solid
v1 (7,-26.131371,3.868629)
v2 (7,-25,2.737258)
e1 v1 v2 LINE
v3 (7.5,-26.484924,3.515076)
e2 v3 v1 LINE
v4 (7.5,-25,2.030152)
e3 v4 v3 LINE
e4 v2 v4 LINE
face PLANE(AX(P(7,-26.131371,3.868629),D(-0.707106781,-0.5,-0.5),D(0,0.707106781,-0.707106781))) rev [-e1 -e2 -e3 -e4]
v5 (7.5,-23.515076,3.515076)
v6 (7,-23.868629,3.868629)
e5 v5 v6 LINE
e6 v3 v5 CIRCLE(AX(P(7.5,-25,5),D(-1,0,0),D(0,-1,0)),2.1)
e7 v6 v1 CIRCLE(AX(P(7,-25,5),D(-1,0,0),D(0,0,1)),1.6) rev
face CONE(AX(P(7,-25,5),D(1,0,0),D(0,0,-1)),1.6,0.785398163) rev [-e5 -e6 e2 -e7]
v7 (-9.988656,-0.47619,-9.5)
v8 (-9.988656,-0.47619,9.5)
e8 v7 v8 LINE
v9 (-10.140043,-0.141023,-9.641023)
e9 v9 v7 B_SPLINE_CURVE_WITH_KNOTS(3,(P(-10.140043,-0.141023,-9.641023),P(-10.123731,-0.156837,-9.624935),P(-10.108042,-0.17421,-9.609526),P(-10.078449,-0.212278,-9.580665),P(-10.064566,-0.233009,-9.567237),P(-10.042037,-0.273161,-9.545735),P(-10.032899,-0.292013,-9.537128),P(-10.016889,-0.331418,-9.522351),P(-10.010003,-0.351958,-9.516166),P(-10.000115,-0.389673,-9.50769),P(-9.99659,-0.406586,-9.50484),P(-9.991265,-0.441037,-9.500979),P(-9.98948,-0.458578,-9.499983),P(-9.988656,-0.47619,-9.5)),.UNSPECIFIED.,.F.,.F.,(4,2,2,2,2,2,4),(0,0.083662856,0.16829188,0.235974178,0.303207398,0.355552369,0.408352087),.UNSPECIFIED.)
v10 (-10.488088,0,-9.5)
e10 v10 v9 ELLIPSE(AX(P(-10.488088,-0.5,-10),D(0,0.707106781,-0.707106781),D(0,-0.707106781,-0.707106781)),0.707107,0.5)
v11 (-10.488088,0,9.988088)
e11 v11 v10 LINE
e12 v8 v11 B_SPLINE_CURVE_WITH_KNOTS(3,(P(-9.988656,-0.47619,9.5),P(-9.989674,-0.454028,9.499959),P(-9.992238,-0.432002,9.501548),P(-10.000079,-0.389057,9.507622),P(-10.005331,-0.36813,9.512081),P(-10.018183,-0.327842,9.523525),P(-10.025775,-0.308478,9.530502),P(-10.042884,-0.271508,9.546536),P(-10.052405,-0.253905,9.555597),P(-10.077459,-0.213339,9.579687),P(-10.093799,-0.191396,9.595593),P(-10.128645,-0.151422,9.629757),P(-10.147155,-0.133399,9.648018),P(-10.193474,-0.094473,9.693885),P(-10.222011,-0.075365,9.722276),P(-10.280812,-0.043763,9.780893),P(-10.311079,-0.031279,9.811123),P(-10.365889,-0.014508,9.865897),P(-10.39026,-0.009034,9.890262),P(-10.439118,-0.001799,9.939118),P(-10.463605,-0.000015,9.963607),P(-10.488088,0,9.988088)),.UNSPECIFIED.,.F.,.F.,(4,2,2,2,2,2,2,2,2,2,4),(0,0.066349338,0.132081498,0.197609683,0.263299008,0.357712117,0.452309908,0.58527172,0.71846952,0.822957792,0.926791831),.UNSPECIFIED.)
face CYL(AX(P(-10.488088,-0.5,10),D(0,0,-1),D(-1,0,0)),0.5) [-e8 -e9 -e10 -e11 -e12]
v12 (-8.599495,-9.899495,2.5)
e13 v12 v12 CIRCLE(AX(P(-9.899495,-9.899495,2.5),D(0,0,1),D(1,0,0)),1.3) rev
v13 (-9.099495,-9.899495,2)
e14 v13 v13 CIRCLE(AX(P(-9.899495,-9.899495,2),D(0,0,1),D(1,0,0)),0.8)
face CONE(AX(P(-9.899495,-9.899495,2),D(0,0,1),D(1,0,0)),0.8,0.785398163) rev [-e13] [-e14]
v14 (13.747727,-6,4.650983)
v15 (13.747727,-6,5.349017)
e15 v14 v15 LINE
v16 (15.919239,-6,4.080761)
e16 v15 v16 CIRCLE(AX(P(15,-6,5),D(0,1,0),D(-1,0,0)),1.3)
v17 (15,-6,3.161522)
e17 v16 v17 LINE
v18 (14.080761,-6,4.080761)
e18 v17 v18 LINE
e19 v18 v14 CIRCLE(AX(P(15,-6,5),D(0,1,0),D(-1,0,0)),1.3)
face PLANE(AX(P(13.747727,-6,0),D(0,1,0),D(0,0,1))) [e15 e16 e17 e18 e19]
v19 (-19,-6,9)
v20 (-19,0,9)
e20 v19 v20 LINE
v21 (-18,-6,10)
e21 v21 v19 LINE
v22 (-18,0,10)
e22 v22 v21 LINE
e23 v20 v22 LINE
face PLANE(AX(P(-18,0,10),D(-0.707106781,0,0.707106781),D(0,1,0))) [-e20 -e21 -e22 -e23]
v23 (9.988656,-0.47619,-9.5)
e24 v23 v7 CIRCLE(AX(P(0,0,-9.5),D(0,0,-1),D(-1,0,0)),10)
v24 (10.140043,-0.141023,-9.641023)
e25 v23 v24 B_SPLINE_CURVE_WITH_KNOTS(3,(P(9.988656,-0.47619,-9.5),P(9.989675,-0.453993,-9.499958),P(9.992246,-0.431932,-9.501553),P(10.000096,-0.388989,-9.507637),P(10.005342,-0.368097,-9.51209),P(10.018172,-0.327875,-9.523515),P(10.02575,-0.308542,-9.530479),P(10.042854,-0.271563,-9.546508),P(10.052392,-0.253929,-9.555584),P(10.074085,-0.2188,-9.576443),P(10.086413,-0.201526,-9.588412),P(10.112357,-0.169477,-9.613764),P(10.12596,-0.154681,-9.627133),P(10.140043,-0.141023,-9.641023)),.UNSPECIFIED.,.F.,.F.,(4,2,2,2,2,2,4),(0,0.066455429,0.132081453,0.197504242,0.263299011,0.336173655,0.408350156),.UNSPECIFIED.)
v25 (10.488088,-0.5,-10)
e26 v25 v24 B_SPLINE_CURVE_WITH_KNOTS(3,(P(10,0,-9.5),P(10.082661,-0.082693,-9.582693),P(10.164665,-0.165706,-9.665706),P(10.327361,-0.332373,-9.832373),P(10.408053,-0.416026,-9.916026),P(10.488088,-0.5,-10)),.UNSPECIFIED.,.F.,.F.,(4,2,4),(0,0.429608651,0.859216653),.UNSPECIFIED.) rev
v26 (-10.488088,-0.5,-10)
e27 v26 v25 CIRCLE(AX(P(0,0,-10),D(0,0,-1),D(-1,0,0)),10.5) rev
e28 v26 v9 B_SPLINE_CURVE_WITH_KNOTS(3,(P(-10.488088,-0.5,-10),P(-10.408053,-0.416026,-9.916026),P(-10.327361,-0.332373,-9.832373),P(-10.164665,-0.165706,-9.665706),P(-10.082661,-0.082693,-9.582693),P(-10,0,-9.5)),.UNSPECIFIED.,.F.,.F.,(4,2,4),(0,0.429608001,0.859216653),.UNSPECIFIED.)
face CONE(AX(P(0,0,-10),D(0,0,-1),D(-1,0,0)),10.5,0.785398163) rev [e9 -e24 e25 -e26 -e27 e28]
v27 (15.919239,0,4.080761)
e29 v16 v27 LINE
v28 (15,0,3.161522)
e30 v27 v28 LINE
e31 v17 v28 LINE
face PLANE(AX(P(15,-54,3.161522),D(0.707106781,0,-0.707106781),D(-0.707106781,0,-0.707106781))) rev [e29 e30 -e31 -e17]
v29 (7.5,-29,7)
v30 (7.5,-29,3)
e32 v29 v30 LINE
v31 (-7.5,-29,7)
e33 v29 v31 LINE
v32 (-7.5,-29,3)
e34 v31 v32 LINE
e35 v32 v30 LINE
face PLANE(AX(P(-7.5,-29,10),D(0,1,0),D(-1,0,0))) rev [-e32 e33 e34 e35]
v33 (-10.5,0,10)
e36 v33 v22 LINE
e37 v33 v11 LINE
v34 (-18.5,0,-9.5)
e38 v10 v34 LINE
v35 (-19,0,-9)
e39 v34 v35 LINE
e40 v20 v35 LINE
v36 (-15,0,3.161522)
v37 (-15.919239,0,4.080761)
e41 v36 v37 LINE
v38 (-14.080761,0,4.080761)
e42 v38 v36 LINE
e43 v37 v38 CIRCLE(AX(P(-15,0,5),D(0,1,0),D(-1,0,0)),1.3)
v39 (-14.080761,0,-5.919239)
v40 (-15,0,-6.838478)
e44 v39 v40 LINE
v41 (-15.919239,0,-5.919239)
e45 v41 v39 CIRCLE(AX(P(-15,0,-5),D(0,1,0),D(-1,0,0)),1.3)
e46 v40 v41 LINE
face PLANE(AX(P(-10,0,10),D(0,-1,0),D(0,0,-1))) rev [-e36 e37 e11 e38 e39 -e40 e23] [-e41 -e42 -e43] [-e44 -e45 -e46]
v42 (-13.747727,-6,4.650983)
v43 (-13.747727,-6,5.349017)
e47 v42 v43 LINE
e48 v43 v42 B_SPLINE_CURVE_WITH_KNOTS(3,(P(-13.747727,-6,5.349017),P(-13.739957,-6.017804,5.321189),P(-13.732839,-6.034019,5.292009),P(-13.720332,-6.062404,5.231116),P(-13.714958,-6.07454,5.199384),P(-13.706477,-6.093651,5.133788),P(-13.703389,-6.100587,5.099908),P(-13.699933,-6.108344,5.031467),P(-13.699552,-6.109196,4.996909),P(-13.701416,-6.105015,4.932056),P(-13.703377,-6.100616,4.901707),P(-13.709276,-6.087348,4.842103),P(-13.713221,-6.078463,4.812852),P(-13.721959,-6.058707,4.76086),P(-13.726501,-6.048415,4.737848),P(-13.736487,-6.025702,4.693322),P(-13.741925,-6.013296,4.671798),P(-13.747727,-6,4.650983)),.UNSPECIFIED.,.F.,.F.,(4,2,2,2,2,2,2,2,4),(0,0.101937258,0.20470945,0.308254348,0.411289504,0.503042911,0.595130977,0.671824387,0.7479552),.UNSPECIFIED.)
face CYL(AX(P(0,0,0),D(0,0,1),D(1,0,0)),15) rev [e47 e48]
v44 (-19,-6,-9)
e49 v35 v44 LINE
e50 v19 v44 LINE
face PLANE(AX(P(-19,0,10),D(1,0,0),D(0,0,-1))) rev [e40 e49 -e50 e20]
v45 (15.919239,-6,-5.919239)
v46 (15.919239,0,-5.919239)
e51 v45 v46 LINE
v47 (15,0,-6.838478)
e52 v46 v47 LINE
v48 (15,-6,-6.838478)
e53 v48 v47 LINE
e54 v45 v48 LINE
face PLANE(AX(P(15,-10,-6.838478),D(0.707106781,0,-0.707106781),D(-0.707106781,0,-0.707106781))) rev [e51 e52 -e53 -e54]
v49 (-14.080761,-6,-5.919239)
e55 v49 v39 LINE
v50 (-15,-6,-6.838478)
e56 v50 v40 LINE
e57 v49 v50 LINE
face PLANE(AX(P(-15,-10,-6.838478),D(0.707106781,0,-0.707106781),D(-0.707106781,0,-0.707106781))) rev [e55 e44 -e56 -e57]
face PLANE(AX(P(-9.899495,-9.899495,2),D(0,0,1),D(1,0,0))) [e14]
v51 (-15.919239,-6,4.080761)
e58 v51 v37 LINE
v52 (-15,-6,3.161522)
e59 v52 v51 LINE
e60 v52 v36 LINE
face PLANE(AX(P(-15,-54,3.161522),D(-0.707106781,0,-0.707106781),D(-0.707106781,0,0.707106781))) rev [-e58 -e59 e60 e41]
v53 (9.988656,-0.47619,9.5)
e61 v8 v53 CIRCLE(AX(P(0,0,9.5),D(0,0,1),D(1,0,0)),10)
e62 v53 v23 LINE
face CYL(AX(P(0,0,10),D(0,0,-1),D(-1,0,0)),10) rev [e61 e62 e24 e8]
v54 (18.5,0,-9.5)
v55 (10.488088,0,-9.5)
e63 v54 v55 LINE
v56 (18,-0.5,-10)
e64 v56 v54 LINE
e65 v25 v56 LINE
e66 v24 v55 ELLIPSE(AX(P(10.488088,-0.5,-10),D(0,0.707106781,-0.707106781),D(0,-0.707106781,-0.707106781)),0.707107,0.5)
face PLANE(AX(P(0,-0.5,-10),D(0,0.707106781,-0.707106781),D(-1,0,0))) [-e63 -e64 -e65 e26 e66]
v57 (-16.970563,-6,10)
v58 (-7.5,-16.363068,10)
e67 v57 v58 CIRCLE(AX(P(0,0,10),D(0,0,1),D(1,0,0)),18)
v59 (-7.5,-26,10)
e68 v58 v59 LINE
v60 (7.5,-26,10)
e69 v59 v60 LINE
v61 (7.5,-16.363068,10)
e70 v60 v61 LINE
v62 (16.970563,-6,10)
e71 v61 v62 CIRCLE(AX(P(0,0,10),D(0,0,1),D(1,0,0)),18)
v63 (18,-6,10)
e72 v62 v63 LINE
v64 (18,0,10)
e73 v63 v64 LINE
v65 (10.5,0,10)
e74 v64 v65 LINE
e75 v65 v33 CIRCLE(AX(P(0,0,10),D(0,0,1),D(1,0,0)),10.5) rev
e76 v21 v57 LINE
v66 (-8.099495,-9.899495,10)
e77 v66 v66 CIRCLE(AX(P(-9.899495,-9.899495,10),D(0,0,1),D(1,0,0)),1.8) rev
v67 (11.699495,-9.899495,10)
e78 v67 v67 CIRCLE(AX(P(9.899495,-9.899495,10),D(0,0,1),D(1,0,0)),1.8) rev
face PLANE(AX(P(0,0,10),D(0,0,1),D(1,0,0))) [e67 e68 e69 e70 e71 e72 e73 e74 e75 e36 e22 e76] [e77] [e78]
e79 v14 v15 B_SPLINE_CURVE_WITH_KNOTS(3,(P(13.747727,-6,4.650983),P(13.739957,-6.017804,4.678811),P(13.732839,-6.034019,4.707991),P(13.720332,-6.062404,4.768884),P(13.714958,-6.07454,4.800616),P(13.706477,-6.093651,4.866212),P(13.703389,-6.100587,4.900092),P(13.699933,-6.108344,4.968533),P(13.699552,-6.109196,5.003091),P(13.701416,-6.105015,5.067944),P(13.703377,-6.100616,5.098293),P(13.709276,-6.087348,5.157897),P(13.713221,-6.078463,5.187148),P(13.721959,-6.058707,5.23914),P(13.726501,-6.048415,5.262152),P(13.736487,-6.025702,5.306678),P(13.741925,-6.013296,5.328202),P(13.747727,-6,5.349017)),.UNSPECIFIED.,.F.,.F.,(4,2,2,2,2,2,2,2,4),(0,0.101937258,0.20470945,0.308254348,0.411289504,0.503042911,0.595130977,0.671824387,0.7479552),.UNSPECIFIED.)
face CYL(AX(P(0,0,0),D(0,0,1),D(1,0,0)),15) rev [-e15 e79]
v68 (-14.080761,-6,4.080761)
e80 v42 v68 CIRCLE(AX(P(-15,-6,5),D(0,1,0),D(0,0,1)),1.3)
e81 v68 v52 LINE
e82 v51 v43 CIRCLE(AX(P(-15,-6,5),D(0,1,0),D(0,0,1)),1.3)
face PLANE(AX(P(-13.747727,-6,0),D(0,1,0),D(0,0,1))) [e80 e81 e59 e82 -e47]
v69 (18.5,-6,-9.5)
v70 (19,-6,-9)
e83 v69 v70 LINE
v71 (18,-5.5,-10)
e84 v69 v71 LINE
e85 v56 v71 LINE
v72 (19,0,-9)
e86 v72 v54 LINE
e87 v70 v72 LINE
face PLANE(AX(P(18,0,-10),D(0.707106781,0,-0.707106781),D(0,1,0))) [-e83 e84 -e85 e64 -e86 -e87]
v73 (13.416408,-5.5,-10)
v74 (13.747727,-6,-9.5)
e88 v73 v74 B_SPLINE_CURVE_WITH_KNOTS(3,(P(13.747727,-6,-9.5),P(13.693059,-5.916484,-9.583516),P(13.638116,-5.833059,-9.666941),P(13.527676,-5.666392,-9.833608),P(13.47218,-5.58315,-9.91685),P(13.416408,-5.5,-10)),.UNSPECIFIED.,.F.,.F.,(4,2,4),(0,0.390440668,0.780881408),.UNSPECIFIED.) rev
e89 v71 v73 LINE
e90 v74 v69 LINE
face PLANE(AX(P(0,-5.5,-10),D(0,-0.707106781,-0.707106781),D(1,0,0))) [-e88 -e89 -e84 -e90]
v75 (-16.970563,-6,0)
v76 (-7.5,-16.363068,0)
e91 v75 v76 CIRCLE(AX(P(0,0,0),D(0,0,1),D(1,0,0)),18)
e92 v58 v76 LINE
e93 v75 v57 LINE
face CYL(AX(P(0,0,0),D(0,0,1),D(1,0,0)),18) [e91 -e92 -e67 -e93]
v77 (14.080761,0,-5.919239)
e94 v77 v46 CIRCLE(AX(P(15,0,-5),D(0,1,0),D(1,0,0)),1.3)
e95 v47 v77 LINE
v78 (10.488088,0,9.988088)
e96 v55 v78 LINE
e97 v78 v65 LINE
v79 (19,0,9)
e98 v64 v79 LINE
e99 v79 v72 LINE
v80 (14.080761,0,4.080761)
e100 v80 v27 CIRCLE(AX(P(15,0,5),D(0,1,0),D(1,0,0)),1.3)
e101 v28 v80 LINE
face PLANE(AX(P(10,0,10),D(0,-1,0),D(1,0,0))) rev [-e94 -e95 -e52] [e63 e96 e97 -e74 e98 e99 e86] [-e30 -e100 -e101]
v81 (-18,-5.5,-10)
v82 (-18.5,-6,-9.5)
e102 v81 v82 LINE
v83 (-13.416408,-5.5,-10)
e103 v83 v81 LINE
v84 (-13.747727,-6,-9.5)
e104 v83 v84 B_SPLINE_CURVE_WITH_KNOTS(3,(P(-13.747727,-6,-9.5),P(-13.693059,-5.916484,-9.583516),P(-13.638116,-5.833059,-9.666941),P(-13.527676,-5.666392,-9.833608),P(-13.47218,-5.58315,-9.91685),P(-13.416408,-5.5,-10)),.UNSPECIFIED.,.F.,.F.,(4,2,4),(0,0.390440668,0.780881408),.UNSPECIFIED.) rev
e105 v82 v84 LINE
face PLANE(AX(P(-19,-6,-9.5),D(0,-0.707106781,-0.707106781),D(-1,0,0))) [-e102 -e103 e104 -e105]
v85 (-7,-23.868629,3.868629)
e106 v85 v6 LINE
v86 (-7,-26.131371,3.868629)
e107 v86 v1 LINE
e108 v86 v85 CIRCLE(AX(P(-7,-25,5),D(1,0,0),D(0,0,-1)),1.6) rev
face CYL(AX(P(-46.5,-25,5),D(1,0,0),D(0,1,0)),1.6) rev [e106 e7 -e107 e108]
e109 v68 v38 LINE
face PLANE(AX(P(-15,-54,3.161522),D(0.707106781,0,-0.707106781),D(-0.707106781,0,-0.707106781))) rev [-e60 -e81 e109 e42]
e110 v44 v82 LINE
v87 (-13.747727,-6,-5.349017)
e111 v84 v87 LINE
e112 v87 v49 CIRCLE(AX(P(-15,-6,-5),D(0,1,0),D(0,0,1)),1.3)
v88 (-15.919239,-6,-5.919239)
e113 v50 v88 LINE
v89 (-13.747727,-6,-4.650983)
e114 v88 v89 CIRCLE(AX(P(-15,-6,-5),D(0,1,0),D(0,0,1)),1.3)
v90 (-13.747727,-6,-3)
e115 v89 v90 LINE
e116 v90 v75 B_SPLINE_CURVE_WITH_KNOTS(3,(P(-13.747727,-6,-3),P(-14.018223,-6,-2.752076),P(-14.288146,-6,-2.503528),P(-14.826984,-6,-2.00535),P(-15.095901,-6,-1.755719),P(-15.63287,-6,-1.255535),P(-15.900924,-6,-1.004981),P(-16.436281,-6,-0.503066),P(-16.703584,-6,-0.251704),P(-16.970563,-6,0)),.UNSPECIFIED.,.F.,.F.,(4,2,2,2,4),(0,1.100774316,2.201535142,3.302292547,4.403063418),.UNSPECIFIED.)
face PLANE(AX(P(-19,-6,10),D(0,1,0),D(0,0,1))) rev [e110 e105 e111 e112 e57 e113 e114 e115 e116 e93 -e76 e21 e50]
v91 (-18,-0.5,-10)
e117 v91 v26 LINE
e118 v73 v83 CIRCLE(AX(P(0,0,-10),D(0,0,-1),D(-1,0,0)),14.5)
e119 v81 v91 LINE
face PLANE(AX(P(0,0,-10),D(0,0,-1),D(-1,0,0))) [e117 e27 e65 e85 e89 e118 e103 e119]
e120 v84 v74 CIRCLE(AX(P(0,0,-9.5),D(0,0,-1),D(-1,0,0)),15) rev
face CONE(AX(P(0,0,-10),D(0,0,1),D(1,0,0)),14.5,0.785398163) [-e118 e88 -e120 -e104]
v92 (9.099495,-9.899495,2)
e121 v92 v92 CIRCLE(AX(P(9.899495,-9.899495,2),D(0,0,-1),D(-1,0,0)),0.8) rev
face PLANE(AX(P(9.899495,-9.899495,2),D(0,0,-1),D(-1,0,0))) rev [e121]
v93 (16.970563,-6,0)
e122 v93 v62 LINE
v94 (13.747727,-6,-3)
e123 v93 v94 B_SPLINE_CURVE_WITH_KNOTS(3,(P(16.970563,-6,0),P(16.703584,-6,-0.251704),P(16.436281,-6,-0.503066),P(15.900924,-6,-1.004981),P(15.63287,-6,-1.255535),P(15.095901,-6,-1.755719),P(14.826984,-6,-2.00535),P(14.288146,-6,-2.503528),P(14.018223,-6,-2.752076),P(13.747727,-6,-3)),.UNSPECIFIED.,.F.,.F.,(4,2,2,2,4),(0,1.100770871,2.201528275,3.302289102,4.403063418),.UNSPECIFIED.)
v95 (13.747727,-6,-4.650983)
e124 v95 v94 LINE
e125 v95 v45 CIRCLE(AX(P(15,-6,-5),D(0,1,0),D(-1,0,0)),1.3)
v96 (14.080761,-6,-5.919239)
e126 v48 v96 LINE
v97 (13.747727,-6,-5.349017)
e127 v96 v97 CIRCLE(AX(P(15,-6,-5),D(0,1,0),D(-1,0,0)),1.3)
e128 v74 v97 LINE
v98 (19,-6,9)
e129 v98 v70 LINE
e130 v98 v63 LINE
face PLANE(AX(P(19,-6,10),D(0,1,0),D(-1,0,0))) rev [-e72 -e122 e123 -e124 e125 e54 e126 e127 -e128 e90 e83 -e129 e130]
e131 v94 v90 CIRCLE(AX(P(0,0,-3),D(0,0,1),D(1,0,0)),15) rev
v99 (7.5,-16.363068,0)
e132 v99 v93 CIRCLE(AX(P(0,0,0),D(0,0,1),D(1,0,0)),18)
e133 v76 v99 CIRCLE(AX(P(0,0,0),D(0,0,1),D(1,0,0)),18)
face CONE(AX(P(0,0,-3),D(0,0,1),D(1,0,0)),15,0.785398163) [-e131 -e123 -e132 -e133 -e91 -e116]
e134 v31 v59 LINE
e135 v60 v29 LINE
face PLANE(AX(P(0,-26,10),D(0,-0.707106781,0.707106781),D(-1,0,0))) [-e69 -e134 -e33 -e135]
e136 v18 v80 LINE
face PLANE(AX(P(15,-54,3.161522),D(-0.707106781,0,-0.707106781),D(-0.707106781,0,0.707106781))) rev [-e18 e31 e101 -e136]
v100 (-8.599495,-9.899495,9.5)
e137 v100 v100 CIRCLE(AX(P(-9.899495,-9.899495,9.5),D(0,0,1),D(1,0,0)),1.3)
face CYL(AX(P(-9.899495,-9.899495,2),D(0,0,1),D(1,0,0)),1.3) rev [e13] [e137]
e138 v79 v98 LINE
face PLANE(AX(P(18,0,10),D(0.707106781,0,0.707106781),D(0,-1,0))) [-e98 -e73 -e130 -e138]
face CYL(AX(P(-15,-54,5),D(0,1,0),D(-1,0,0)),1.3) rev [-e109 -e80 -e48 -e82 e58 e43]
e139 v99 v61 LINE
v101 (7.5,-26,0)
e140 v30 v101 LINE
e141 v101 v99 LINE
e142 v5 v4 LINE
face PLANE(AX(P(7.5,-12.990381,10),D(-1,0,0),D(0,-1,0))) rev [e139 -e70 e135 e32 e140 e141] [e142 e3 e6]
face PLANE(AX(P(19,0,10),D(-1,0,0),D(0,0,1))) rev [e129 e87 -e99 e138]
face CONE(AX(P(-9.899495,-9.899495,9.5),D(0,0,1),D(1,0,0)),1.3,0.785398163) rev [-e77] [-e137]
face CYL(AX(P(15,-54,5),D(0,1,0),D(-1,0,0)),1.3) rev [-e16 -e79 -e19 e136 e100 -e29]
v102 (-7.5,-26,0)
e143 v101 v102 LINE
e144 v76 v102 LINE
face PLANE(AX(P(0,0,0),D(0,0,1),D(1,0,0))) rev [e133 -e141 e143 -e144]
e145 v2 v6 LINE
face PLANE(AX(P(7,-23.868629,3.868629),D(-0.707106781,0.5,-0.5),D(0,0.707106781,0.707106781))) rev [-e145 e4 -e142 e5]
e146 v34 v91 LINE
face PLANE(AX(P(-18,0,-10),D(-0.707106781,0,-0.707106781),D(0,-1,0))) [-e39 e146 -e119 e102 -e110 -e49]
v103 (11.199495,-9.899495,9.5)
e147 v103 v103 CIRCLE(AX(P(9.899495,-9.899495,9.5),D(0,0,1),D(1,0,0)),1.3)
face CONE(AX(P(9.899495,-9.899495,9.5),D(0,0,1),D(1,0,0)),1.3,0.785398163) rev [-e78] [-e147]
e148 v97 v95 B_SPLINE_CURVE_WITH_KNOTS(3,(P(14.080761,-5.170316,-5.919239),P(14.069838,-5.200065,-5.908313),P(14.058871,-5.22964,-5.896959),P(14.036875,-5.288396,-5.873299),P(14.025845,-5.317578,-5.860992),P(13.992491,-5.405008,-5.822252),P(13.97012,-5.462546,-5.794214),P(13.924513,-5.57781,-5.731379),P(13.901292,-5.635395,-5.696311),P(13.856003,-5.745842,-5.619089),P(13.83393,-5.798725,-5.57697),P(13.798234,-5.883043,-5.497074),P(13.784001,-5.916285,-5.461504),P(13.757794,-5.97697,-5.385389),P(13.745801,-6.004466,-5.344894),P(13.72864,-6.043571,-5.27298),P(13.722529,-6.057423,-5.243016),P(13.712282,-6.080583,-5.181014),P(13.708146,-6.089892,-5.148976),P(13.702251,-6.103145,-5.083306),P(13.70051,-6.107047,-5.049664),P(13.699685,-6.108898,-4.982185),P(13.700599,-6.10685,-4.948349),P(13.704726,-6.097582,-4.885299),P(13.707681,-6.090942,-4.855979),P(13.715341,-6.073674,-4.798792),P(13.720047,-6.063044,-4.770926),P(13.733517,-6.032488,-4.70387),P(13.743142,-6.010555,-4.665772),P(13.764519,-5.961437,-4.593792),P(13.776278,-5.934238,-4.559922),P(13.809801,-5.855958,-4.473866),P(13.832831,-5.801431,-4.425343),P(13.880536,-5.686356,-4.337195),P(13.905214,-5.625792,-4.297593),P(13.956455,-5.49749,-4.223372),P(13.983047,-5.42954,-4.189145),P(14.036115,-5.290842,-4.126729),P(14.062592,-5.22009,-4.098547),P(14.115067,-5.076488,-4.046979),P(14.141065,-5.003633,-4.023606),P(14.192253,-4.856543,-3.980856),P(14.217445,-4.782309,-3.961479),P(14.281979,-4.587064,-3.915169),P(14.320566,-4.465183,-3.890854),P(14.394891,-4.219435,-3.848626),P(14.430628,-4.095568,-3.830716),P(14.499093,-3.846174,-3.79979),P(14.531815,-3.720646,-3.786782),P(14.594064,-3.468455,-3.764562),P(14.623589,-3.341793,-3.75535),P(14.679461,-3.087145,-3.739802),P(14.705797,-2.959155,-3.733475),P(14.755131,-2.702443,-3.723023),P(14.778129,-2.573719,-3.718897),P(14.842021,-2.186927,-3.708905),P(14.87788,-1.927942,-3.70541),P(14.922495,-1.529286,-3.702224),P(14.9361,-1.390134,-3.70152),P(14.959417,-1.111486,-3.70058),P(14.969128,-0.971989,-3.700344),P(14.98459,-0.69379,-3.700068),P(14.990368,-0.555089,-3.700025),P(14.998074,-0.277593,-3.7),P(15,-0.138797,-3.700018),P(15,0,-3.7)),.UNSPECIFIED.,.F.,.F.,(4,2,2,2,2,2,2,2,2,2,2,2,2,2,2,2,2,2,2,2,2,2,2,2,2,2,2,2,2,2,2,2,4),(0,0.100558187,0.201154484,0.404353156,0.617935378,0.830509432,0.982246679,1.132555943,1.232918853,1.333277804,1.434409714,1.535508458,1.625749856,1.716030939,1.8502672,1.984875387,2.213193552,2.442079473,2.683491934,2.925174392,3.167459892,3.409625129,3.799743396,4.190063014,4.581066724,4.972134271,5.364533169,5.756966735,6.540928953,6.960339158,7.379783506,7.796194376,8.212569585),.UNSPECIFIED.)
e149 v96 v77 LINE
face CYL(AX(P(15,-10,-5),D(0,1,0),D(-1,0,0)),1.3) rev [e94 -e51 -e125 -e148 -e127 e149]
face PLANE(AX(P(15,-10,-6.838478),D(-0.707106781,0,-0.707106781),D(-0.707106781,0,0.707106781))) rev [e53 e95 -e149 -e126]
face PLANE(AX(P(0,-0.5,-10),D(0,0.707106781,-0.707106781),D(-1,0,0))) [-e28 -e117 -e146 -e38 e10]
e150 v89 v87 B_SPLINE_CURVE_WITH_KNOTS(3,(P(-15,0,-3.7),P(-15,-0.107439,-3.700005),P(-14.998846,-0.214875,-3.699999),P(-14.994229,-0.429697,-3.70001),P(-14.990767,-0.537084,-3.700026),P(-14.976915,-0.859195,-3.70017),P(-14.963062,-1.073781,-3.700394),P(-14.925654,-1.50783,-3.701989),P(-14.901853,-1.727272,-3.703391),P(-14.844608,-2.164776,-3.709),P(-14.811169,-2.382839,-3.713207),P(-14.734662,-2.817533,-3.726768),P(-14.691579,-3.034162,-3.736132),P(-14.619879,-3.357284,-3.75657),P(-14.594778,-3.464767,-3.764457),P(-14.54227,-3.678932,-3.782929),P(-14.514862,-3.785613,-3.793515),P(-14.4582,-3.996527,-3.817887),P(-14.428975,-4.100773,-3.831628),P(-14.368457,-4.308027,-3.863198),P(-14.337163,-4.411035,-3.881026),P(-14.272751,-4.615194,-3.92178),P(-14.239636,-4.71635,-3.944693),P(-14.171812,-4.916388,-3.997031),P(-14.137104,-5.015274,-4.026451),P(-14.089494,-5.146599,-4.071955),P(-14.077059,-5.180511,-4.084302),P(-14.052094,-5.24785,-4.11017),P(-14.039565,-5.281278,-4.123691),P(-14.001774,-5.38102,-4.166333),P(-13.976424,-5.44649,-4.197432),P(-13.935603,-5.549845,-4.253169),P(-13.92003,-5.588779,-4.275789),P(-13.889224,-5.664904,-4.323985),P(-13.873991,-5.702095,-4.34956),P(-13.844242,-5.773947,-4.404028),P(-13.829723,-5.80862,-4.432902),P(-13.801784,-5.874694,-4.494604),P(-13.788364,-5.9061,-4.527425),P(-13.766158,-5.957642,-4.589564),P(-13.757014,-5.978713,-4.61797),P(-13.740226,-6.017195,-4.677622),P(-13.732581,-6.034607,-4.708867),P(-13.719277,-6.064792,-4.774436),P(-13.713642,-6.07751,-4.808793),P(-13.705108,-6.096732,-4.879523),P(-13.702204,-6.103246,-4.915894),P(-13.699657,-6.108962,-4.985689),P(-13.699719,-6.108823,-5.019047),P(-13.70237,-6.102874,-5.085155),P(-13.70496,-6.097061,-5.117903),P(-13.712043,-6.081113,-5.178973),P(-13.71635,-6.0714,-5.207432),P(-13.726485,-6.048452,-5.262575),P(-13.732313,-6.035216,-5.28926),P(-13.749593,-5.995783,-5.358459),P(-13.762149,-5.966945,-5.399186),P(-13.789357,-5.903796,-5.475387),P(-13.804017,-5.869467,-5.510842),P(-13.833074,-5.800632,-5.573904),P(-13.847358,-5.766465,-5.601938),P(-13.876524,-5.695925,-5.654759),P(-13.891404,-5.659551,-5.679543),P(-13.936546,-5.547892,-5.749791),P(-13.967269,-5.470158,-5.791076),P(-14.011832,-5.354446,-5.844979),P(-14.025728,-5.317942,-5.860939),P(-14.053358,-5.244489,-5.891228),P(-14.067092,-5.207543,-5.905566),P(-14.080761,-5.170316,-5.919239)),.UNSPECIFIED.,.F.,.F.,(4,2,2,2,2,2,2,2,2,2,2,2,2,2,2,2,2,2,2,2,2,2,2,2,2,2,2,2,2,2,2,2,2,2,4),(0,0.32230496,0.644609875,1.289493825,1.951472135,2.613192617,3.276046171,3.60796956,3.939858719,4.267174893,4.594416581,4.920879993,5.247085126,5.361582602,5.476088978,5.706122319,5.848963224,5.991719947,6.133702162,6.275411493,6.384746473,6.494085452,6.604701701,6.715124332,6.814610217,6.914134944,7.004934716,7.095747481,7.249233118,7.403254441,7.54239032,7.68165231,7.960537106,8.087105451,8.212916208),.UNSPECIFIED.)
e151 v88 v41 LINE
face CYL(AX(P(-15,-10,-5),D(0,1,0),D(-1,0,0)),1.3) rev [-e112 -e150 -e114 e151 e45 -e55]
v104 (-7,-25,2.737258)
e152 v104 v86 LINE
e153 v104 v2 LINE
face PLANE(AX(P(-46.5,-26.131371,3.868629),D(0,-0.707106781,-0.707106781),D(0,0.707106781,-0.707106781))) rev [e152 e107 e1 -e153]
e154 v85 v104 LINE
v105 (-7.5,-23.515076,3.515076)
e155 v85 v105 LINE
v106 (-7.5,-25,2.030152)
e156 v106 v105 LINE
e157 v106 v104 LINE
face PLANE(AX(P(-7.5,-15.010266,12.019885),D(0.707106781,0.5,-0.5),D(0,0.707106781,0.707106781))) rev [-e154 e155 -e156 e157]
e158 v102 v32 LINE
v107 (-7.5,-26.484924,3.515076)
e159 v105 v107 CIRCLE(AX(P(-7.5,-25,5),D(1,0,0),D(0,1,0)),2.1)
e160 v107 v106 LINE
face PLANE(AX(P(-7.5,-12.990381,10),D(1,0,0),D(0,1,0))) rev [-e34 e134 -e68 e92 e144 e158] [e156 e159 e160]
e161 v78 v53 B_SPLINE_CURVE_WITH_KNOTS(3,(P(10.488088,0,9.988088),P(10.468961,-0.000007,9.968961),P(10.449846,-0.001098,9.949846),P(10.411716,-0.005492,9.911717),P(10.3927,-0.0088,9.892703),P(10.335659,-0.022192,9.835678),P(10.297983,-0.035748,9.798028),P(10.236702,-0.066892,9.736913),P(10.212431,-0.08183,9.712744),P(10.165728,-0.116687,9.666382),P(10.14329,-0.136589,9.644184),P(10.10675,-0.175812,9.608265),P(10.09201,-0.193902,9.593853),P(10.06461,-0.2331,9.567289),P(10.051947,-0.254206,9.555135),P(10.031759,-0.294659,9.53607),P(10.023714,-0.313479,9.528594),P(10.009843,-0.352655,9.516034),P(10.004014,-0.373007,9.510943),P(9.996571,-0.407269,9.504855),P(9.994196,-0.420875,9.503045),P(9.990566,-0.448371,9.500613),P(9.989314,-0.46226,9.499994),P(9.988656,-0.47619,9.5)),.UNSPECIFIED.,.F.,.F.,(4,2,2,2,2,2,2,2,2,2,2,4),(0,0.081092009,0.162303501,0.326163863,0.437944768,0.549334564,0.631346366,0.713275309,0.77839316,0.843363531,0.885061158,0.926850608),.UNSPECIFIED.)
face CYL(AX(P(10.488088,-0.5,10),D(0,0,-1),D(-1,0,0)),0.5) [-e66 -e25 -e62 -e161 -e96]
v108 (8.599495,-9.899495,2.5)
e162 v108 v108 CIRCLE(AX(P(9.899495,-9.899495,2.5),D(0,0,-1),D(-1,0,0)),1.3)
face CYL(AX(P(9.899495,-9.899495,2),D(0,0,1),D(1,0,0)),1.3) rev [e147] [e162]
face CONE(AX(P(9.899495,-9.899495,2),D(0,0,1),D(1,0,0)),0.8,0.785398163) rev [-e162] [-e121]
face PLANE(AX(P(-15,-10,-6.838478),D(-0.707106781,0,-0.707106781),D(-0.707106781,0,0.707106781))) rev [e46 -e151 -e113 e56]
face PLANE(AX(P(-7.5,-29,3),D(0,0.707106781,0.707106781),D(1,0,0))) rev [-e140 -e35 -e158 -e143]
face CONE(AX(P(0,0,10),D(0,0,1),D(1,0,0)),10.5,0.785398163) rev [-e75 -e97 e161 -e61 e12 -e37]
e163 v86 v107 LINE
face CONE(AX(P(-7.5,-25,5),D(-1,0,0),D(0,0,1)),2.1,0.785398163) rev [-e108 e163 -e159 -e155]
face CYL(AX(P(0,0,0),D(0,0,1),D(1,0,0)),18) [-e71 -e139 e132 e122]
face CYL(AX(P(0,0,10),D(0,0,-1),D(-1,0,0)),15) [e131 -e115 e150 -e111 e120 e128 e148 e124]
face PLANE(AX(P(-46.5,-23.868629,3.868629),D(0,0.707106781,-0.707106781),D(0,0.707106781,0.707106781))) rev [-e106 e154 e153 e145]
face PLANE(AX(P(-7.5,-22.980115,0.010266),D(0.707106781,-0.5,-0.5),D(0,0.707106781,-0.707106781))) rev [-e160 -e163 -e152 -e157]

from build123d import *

# Parameters (mm, degrees)
EXTRUDE_1_DEPTH     = 10
CUT_EXTRUDE_1_DEPTH = 54
CUT_EXTRUDE_2_DEPTH = 54
EXTRUDE_START       = 10
EXTRUDE_2_DEPTH     = 10
EXTRUDE_START_2     = -10
EXTRUDE_3_DEPTH     = 10
EXTRUDE_4_DEPTH     = 10
CUT_EXTRUDE_3_DEPTH = 10
SKETCH_9_R          = 1.3
CUT_EXTRUDE_4_DEPTH = 8
CHAMFER_1_SIZE      = 3
CHAMFER_2_SIZE      = 3
CHAMFER_3_SIZE      = 1
CHAMFER_4_SIZE      = 0.5
FILLET_1_R          = 0.5


with BuildPart() as part:
    # 草图1 → 凸台-拉伸1 (new body)
    with BuildSketch(Plane.XY):
        with BuildLine():
            Line((-10, 0), (-19, 0))
            Line((-19, 0), (-19, -6))
            Line((-19, -6), (-13.747727085, -6))
            ThreePointArc((-13.747727085, -6), (-11.184043696, -9.995857472), (-7.5, -12.990381057))
            Line((-7.5, -12.990381057), (-7.5, -29))
            Line((-7.5, -29), (7.5, -29))
            Line((7.5, -29), (7.5, -12.990381057))
            ThreePointArc((7.5, -12.990381057), (11.184043696, -9.995857472), (13.747727085, -6))
            Line((13.747727085, -6), (19, -6))
            Line((19, -6), (19, 0))
            Line((19, 0), (10, 0))
            ThreePointArc((10, 0), (0, -10), (-10, 0))
        make_face()
    extrude(amount=EXTRUDE_1_DEPTH)

    # 草图3 → 切除-拉伸1 (cut)
    with BuildSketch(Plane(origin=(7.5, 0, 0), x_dir=(0, 0, -1), z_dir=(1, 0, 0))):
        with BuildLine():
            Line((-3.86862915, -23.86862915), (-2.7372583, -25))
            Line((-2.7372583, -25), (-3.86862915, -26.13137085))
            ThreePointArc((-3.86862915, -26.13137085), (-6.6, -25), (-3.86862915, -23.86862915))
        make_face()
    extrude(amount=-CUT_EXTRUDE_1_DEPTH, mode=Mode.SUBTRACT)

    # 草图4 → 切除-拉伸2 (cut)
    with BuildSketch(Plane(origin=(0, 0, 0), x_dir=(1, 0, 0), z_dir=(0, 1, 0))):
        with BuildLine():
            Line((-15, -3.161522369), (-15.919238816, -4.080761184))
            ThreePointArc((-15.919238816, -4.080761184), (-15, -6.3), (-14.080761184, -4.080761184))
            Line((-14.080761184, -4.080761184), (-15, -3.161522369))
        make_face()
        with BuildLine():
            Line((15, -3.161522369), (14.080761184, -4.080761184))
            ThreePointArc((14.080761184, -4.080761184), (15, -6.3), (15.919238816, -4.080761184))
            Line((15.919238816, -4.080761184), (15, -3.161522369))
        make_face()
    extrude(amount=-CUT_EXTRUDE_2_DEPTH, mode=Mode.SUBTRACT)

    # 草图5 → 凸台-拉伸2 (add)
    with BuildSketch(Plane(origin=(0, 0, 0), x_dir=(-1, 0, 0), z_dir=(0, 0, -1)).offset(EXTRUDE_START)):
        with BuildLine():
            Line((-15, 0), (-10, 0))
            ThreePointArc((-10, 0), (0, -10), (10, 0))
            Line((10, 0), (15, 0))
            ThreePointArc((15, 0), (0, -15), (-15, 0))
        make_face()
    extrude(amount=-EXTRUDE_2_DEPTH)

    # 草图6 → 凸台-拉伸3 (add)
    with BuildSketch(Plane.XY.offset(10).offset(EXTRUDE_START_2)):
        with BuildLine():
            Line((-13.747727085, -6), (-16.970562748, -6))
            ThreePointArc((-16.970562748, -6), (0, -18), (16.970562748, -6))
            Line((16.970562748, -6), (13.747727085, -6))
            ThreePointArc((13.747727085, -6), (0, -15), (-13.747727085, -6))
        make_face()
    extrude(amount=EXTRUDE_3_DEPTH)

    # 草图7 → 凸台-拉伸4 (add)
    with BuildSketch(Plane(origin=(0, 0, 0), x_dir=(-1, 0, 0), z_dir=(0, 0, -1)).offset(EXTRUDE_START)):
        with BuildLine():
            Line((-15, 0), (-19, 0))
            Line((-19, 0), (-19, -6))
            Line((-19, -6), (-16.970562748, -6))
            Line((-16.970562748, -6), (-13.747727085, -6))
            ThreePointArc((-13.747727085, -6), (-14.683594694, -3.064644655), (-15, 0))
        make_face()
        with BuildLine():
            ThreePointArc((15, 0), (14.683594694, -3.064644655), (13.747727085, -6))
            Line((13.747727085, -6), (16.970562748, -6))
            Line((16.970562748, -6), (19, -6))
            Line((19, -6), (19, 0))
            Line((19, 0), (15, 0))
        make_face()
    extrude(amount=-EXTRUDE_4_DEPTH)

    # 草图8 → 切除-拉伸3 (cut)
    with BuildSketch(Plane(origin=(0, 0, 0), x_dir=(1, 0, 0), z_dir=(0, 1, 0))):
        with BuildLine():
            Line((-15, 6.838477631), (-15.919238816, 5.919238816))
            ThreePointArc((-15.919238816, 5.919238816), (-15, 3.7), (-14.080761184, 5.919238816))
            Line((-14.080761184, 5.919238816), (-15, 6.838477631))
        make_face()
        with BuildLine():
            Line((15, 6.838477631), (14.080761184, 5.919238816))
            ThreePointArc((14.080761184, 5.919238816), (15, 3.7), (15.919238816, 5.919238816))
            Line((15.919238816, 5.919238816), (15, 6.838477631))
        make_face()
    extrude(amount=-CUT_EXTRUDE_3_DEPTH, mode=Mode.SUBTRACT)

    # 草图9 → 切除-拉伸4 (cut)
    with BuildSketch(Plane.XY.offset(10)):
        with Locations((-9.899494937, -9.899494937)):
            Circle(SKETCH_9_R)
        with Locations(Location((9.899494937, -9.899494937, 0), (0, 0, 180))):
            Circle(SKETCH_9_R)
    extrude(amount=-CUT_EXTRUDE_4_DEPTH, mode=Mode.SUBTRACT)

    # 倒角1
    chamfer_1_edges = [part.edges().sort_by_distance(p)[0] for p in [
        (0, -15, 0),
    ]]
    chamfer(chamfer_1_edges, length=CHAMFER_1_SIZE - 0.0001)  # a hair under: the kernel refuses the full size

    # 倒角2
    chamfer_2_edges = [part.edges().sort_by_distance(p)[0] for p in [
        (0, -29, 0),
        (0, -29, 10),
    ]]
    chamfer(chamfer_2_edges, length=CHAMFER_2_SIZE)

    # 倒角3
    chamfer_3_edges = [part.edges().sort_by_distance(p)[0] for p in [
        (-19, -3, 10),
        (19, -3, -10),
        (-19, -3, -10),
        (19, -3, 10),
    ]]
    chamfer(chamfer_3_edges, length=CHAMFER_3_SIZE)

    # 倒角4
    chamfer_4_edges = [part.edges().sort_by_distance(p)[0] for p in [
        (0, -15, -10),
        (-11.199494937, -9.899494937, 2),
        (-11.199494937, -9.899494937, 10),
        (11.199494937, -9.899494937, 2),
        (11.199494937, -9.899494937, 10),
        (15.873863542, -6, -10),
        (-15.873863542, -6, -10),
        (-14, 0, -10),
        (-7.5, -25, 6.6),
        (-7.5, -24.434314575, 3.302943725),
        (-7.5, -25.565685425, 3.302943725),
        (7.5, -25, 6.6),
        (7.5, -25.565685425, 3.302943725),
        (7.5, -24.434314575, 3.302943725),
        (0, -10, 10),
        (0, -10, -10),
        (14, 0, -10),
    ]]
    chamfer(chamfer_4_edges, length=CHAMFER_4_SIZE)

    # 圆角1
    fillet_1_edges = [part.edges().sort_by_distance(p)[0] for p in [
        (10, 0, 0),
        (-10, 0, 0),
    ]]
    fillet(fillet_1_edges, radius=FILLET_1_R)


solid = part.part
